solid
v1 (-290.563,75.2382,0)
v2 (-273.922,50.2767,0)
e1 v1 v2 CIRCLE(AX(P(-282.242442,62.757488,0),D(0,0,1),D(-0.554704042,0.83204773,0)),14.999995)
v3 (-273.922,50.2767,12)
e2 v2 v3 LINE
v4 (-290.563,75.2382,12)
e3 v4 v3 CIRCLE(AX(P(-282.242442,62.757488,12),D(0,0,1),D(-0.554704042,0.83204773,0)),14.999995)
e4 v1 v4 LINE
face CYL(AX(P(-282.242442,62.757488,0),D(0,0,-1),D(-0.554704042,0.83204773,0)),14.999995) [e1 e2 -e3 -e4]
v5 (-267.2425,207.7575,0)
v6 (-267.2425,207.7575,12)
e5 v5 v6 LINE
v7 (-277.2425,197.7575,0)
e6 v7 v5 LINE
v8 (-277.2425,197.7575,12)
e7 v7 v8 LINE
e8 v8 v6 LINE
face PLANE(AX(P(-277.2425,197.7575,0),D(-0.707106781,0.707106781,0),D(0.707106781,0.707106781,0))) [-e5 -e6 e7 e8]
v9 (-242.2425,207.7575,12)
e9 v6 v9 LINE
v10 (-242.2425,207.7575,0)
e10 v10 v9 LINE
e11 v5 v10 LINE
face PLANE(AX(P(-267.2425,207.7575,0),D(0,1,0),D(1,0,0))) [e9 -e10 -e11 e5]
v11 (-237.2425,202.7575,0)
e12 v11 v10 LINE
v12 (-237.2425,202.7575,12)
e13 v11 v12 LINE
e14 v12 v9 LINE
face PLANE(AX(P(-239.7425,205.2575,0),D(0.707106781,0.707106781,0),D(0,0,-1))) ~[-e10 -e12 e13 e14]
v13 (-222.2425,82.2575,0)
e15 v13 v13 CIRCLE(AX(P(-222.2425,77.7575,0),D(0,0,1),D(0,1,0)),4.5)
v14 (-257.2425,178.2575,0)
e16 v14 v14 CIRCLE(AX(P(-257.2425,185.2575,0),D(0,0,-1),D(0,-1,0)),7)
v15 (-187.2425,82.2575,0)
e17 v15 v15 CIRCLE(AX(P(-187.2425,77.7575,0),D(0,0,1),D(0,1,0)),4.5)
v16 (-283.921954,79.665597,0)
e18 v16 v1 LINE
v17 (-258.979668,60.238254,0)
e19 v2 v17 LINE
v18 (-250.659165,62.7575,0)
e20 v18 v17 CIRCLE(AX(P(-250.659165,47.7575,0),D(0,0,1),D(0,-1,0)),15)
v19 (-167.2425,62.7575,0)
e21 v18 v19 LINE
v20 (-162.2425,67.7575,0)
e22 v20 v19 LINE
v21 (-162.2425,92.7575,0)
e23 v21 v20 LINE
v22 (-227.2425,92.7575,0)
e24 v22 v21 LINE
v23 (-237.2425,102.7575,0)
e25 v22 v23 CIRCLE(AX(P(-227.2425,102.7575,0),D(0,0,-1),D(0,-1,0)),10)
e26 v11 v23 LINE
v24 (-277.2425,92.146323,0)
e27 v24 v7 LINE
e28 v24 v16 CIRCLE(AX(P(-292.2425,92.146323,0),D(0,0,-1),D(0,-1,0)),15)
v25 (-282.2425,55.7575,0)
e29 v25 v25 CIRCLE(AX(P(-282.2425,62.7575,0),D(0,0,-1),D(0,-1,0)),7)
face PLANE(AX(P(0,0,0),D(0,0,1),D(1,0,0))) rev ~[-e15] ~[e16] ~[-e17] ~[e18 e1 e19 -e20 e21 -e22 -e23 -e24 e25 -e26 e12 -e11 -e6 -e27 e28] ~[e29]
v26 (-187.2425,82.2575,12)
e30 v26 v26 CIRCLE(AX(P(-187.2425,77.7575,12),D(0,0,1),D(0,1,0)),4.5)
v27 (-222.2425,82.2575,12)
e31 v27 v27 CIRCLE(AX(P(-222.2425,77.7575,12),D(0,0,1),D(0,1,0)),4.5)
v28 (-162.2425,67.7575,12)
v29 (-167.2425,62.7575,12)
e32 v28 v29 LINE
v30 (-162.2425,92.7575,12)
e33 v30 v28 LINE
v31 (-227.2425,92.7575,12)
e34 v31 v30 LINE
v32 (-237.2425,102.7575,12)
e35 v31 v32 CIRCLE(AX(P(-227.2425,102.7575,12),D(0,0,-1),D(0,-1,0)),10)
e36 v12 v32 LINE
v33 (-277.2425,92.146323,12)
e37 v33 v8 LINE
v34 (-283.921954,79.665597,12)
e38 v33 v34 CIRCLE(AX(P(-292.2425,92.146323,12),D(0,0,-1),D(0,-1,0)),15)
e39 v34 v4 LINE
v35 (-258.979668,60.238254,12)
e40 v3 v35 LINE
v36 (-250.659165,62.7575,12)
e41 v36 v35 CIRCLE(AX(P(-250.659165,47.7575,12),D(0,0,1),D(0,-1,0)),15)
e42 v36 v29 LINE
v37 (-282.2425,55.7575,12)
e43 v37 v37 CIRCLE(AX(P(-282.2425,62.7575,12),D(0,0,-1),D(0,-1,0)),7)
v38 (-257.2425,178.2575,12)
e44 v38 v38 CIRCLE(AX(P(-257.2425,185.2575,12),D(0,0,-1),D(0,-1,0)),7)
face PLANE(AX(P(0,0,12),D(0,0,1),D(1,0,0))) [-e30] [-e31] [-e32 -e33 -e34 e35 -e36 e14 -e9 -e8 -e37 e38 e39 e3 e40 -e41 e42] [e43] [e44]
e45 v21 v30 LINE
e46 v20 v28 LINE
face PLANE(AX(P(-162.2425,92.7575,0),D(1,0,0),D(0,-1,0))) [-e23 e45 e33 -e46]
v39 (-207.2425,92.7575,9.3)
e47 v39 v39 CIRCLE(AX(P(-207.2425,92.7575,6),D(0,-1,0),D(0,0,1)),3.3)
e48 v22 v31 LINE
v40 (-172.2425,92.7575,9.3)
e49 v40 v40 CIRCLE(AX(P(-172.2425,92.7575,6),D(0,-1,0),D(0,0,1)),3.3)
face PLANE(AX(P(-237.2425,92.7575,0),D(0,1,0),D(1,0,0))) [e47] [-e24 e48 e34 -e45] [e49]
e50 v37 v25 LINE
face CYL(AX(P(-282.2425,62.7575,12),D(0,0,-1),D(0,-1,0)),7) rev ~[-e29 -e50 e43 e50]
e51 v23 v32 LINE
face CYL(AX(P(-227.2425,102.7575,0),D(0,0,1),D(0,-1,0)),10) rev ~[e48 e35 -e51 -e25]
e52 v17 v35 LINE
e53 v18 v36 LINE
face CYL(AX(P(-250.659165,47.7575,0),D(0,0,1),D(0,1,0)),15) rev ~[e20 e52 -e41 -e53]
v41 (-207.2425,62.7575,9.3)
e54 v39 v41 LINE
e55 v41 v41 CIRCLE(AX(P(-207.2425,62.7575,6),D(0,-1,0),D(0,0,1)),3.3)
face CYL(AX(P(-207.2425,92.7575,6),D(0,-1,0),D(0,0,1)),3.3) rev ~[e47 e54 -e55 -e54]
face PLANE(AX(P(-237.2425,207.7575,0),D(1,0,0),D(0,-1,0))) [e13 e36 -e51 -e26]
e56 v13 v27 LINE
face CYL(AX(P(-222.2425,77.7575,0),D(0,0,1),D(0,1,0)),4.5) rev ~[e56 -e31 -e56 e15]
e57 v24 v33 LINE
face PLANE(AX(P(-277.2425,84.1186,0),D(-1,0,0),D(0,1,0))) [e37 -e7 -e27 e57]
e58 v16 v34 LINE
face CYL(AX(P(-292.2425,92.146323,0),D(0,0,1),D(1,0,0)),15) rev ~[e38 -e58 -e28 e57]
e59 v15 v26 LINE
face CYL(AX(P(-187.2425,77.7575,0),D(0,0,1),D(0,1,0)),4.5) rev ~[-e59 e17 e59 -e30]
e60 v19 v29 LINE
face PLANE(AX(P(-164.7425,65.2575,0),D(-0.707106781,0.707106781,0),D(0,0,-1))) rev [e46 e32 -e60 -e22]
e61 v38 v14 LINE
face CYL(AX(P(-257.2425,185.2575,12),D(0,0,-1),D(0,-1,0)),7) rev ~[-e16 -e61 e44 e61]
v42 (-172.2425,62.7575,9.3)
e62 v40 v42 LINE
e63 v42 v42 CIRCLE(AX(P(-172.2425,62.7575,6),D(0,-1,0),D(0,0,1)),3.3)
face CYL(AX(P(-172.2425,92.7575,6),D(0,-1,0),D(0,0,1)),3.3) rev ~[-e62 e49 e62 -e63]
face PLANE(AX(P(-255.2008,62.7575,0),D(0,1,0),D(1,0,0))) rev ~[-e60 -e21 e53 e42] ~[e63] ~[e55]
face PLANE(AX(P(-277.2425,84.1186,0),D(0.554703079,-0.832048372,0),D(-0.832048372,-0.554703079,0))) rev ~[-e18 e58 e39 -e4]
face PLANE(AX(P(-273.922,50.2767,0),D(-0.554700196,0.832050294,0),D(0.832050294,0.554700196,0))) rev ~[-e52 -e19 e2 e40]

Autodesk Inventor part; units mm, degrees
ref_plane "YZ Plane" through (0, 0, 0) normal (1, 0, 0) x (0, 1, 0)
ref_plane "XZ Plane" through (0, 0, 0) normal (0, 1, 0) x (-1, 0, 0)
sketch "スケッチ2" plane through (0, 0, 0) normal (0, 0, 1) x (1, 0, 0)
  line L0 (-162.2425, 92.7575) -> (-162.2425, 62.7575)
  line L1 (-267.2425, 207.7575) -> (-237.2425, 207.7575)
  arc A0 (-290.563, 75.2382) -> (-273.922, 50.2767) centre (-282.2425, 62.7575) ccw
  line L2 (-277.2425, 84.1186) -> (-290.563, 75.2382)
  line L3 (-277.2425, 84.1186) -> (-277.2425, 197.7575)
  line L4 (-277.2425, 197.7575) -> (-267.2425, 207.7575)
  line L5 (-237.2425, 207.7575) -> (-237.2425, 92.7575)
  line L6 (-237.2425, 92.7575) -> (-162.2425, 92.7575)
  line L7 (-273.922, 50.2767) -> (-255.2008, 62.7575)
  line L8 (-255.2008, 62.7575) -> (-162.2425, 62.7575)
  line L9 (-282.2425, 62.7575) -> (-237.2425, 92.7575) construction
  point P0 (0, 0)
  point P1 (-277.2425, 207.7575)
  dimension "d18" = 120
  dimension "d21" = 15
  dimension "d22" = 10
  dimension "d23" = 10
  dimension "d116" = 5
  dimension "d154" = 15
  dimension "d155" = 145
  dimension "d175" = 30
  dimension "d181" = 90
  dimension "d182" = 40
extrude "押し出し2" add sketch "スケッチ2" along normal blind 12
sketch "スケッチ3" plane through (0, 0, 12) normal (0, 0, 1) x (1, 0, 0)
  arc A0 (-290.563, 75.2382) -> (-282.2425, 47.7575) centre (-282.2425, 62.7575) ccw projected
  line L0 (-267.2425, 207.7575) -> (-237.2425, 207.7575) projected
  point P0 (-257.2425, 185.2575)
  dimension "d16" = 25
  dimension "d153" = 22.5
hole "穴1" at (-257.2425, 185.2575, 12) at (-282.2425, 62.7575, 12) direction (0, 0, -1) diameter 14 end through all
sketch "スケッチ10" plane through (-237.2425, 92.7575, 0) normal (0, 1, 0) x (1, 0, 0)
  line L0 (75, 0) -> (75, -12)
  line L1 (0, -12) -> (75, -12)
  line L2 (75, 0) -> (0, 0) projected
  point P0 (65, -6)
  point P1 (30, -6)
  dimension "d119" = 35
  dimension "d156" = 10
  dimension "d157" = 6
hole "穴8" at (-172.2425, 92.7575, 6) at (-207.2425, 92.7575, 6) direction (0, -1, 0) diameter 6.6 end through all
chamfer "面取り1" distance 5 angle 45 1 edges at (-162.2425, 62.7575, 6)
fillet "フィレット1" radius 10 1 edges at (-237.2425, 92.7575, 6)
chamfer "面取り2" distance 5 angle 45 1 edges at (-237.2425, 207.7575, 6)
ref_plane "Work Plane2" through (-255.2008, 77.7575, 0) normal (0, -1, 0) x (1, 0, 0)
sketch "Sketch18" plane through (0, 0, 0) normal (0, 0, -1) x (-1, 0, 0)
  line L0 (162.2425, 67.7575) -> (162.2425, 92.7575) projected
  line L1 (324.2425, 77.7575) -> (135.2425, 77.7575) construction
  point P0 (187.2425, 77.7575)
  dimension "d165" = 25
hole "Hole13" at (-187.2425, 77.7575, 0) direction (0, 0, 1) diameter 9 end through all
pattern_linear "Rectangular Pattern1" count 2 spacing 35 along (-1, 0, 0) of "Hole13"
fillet "Fillet2" radius 15 2 edges at (-255.2008, 62.7575, 6) (-277.2425, 84.1186, 6)
equation "\"d23\" = d22"
properties part number "210-104c" material "STEEL - MILD"
